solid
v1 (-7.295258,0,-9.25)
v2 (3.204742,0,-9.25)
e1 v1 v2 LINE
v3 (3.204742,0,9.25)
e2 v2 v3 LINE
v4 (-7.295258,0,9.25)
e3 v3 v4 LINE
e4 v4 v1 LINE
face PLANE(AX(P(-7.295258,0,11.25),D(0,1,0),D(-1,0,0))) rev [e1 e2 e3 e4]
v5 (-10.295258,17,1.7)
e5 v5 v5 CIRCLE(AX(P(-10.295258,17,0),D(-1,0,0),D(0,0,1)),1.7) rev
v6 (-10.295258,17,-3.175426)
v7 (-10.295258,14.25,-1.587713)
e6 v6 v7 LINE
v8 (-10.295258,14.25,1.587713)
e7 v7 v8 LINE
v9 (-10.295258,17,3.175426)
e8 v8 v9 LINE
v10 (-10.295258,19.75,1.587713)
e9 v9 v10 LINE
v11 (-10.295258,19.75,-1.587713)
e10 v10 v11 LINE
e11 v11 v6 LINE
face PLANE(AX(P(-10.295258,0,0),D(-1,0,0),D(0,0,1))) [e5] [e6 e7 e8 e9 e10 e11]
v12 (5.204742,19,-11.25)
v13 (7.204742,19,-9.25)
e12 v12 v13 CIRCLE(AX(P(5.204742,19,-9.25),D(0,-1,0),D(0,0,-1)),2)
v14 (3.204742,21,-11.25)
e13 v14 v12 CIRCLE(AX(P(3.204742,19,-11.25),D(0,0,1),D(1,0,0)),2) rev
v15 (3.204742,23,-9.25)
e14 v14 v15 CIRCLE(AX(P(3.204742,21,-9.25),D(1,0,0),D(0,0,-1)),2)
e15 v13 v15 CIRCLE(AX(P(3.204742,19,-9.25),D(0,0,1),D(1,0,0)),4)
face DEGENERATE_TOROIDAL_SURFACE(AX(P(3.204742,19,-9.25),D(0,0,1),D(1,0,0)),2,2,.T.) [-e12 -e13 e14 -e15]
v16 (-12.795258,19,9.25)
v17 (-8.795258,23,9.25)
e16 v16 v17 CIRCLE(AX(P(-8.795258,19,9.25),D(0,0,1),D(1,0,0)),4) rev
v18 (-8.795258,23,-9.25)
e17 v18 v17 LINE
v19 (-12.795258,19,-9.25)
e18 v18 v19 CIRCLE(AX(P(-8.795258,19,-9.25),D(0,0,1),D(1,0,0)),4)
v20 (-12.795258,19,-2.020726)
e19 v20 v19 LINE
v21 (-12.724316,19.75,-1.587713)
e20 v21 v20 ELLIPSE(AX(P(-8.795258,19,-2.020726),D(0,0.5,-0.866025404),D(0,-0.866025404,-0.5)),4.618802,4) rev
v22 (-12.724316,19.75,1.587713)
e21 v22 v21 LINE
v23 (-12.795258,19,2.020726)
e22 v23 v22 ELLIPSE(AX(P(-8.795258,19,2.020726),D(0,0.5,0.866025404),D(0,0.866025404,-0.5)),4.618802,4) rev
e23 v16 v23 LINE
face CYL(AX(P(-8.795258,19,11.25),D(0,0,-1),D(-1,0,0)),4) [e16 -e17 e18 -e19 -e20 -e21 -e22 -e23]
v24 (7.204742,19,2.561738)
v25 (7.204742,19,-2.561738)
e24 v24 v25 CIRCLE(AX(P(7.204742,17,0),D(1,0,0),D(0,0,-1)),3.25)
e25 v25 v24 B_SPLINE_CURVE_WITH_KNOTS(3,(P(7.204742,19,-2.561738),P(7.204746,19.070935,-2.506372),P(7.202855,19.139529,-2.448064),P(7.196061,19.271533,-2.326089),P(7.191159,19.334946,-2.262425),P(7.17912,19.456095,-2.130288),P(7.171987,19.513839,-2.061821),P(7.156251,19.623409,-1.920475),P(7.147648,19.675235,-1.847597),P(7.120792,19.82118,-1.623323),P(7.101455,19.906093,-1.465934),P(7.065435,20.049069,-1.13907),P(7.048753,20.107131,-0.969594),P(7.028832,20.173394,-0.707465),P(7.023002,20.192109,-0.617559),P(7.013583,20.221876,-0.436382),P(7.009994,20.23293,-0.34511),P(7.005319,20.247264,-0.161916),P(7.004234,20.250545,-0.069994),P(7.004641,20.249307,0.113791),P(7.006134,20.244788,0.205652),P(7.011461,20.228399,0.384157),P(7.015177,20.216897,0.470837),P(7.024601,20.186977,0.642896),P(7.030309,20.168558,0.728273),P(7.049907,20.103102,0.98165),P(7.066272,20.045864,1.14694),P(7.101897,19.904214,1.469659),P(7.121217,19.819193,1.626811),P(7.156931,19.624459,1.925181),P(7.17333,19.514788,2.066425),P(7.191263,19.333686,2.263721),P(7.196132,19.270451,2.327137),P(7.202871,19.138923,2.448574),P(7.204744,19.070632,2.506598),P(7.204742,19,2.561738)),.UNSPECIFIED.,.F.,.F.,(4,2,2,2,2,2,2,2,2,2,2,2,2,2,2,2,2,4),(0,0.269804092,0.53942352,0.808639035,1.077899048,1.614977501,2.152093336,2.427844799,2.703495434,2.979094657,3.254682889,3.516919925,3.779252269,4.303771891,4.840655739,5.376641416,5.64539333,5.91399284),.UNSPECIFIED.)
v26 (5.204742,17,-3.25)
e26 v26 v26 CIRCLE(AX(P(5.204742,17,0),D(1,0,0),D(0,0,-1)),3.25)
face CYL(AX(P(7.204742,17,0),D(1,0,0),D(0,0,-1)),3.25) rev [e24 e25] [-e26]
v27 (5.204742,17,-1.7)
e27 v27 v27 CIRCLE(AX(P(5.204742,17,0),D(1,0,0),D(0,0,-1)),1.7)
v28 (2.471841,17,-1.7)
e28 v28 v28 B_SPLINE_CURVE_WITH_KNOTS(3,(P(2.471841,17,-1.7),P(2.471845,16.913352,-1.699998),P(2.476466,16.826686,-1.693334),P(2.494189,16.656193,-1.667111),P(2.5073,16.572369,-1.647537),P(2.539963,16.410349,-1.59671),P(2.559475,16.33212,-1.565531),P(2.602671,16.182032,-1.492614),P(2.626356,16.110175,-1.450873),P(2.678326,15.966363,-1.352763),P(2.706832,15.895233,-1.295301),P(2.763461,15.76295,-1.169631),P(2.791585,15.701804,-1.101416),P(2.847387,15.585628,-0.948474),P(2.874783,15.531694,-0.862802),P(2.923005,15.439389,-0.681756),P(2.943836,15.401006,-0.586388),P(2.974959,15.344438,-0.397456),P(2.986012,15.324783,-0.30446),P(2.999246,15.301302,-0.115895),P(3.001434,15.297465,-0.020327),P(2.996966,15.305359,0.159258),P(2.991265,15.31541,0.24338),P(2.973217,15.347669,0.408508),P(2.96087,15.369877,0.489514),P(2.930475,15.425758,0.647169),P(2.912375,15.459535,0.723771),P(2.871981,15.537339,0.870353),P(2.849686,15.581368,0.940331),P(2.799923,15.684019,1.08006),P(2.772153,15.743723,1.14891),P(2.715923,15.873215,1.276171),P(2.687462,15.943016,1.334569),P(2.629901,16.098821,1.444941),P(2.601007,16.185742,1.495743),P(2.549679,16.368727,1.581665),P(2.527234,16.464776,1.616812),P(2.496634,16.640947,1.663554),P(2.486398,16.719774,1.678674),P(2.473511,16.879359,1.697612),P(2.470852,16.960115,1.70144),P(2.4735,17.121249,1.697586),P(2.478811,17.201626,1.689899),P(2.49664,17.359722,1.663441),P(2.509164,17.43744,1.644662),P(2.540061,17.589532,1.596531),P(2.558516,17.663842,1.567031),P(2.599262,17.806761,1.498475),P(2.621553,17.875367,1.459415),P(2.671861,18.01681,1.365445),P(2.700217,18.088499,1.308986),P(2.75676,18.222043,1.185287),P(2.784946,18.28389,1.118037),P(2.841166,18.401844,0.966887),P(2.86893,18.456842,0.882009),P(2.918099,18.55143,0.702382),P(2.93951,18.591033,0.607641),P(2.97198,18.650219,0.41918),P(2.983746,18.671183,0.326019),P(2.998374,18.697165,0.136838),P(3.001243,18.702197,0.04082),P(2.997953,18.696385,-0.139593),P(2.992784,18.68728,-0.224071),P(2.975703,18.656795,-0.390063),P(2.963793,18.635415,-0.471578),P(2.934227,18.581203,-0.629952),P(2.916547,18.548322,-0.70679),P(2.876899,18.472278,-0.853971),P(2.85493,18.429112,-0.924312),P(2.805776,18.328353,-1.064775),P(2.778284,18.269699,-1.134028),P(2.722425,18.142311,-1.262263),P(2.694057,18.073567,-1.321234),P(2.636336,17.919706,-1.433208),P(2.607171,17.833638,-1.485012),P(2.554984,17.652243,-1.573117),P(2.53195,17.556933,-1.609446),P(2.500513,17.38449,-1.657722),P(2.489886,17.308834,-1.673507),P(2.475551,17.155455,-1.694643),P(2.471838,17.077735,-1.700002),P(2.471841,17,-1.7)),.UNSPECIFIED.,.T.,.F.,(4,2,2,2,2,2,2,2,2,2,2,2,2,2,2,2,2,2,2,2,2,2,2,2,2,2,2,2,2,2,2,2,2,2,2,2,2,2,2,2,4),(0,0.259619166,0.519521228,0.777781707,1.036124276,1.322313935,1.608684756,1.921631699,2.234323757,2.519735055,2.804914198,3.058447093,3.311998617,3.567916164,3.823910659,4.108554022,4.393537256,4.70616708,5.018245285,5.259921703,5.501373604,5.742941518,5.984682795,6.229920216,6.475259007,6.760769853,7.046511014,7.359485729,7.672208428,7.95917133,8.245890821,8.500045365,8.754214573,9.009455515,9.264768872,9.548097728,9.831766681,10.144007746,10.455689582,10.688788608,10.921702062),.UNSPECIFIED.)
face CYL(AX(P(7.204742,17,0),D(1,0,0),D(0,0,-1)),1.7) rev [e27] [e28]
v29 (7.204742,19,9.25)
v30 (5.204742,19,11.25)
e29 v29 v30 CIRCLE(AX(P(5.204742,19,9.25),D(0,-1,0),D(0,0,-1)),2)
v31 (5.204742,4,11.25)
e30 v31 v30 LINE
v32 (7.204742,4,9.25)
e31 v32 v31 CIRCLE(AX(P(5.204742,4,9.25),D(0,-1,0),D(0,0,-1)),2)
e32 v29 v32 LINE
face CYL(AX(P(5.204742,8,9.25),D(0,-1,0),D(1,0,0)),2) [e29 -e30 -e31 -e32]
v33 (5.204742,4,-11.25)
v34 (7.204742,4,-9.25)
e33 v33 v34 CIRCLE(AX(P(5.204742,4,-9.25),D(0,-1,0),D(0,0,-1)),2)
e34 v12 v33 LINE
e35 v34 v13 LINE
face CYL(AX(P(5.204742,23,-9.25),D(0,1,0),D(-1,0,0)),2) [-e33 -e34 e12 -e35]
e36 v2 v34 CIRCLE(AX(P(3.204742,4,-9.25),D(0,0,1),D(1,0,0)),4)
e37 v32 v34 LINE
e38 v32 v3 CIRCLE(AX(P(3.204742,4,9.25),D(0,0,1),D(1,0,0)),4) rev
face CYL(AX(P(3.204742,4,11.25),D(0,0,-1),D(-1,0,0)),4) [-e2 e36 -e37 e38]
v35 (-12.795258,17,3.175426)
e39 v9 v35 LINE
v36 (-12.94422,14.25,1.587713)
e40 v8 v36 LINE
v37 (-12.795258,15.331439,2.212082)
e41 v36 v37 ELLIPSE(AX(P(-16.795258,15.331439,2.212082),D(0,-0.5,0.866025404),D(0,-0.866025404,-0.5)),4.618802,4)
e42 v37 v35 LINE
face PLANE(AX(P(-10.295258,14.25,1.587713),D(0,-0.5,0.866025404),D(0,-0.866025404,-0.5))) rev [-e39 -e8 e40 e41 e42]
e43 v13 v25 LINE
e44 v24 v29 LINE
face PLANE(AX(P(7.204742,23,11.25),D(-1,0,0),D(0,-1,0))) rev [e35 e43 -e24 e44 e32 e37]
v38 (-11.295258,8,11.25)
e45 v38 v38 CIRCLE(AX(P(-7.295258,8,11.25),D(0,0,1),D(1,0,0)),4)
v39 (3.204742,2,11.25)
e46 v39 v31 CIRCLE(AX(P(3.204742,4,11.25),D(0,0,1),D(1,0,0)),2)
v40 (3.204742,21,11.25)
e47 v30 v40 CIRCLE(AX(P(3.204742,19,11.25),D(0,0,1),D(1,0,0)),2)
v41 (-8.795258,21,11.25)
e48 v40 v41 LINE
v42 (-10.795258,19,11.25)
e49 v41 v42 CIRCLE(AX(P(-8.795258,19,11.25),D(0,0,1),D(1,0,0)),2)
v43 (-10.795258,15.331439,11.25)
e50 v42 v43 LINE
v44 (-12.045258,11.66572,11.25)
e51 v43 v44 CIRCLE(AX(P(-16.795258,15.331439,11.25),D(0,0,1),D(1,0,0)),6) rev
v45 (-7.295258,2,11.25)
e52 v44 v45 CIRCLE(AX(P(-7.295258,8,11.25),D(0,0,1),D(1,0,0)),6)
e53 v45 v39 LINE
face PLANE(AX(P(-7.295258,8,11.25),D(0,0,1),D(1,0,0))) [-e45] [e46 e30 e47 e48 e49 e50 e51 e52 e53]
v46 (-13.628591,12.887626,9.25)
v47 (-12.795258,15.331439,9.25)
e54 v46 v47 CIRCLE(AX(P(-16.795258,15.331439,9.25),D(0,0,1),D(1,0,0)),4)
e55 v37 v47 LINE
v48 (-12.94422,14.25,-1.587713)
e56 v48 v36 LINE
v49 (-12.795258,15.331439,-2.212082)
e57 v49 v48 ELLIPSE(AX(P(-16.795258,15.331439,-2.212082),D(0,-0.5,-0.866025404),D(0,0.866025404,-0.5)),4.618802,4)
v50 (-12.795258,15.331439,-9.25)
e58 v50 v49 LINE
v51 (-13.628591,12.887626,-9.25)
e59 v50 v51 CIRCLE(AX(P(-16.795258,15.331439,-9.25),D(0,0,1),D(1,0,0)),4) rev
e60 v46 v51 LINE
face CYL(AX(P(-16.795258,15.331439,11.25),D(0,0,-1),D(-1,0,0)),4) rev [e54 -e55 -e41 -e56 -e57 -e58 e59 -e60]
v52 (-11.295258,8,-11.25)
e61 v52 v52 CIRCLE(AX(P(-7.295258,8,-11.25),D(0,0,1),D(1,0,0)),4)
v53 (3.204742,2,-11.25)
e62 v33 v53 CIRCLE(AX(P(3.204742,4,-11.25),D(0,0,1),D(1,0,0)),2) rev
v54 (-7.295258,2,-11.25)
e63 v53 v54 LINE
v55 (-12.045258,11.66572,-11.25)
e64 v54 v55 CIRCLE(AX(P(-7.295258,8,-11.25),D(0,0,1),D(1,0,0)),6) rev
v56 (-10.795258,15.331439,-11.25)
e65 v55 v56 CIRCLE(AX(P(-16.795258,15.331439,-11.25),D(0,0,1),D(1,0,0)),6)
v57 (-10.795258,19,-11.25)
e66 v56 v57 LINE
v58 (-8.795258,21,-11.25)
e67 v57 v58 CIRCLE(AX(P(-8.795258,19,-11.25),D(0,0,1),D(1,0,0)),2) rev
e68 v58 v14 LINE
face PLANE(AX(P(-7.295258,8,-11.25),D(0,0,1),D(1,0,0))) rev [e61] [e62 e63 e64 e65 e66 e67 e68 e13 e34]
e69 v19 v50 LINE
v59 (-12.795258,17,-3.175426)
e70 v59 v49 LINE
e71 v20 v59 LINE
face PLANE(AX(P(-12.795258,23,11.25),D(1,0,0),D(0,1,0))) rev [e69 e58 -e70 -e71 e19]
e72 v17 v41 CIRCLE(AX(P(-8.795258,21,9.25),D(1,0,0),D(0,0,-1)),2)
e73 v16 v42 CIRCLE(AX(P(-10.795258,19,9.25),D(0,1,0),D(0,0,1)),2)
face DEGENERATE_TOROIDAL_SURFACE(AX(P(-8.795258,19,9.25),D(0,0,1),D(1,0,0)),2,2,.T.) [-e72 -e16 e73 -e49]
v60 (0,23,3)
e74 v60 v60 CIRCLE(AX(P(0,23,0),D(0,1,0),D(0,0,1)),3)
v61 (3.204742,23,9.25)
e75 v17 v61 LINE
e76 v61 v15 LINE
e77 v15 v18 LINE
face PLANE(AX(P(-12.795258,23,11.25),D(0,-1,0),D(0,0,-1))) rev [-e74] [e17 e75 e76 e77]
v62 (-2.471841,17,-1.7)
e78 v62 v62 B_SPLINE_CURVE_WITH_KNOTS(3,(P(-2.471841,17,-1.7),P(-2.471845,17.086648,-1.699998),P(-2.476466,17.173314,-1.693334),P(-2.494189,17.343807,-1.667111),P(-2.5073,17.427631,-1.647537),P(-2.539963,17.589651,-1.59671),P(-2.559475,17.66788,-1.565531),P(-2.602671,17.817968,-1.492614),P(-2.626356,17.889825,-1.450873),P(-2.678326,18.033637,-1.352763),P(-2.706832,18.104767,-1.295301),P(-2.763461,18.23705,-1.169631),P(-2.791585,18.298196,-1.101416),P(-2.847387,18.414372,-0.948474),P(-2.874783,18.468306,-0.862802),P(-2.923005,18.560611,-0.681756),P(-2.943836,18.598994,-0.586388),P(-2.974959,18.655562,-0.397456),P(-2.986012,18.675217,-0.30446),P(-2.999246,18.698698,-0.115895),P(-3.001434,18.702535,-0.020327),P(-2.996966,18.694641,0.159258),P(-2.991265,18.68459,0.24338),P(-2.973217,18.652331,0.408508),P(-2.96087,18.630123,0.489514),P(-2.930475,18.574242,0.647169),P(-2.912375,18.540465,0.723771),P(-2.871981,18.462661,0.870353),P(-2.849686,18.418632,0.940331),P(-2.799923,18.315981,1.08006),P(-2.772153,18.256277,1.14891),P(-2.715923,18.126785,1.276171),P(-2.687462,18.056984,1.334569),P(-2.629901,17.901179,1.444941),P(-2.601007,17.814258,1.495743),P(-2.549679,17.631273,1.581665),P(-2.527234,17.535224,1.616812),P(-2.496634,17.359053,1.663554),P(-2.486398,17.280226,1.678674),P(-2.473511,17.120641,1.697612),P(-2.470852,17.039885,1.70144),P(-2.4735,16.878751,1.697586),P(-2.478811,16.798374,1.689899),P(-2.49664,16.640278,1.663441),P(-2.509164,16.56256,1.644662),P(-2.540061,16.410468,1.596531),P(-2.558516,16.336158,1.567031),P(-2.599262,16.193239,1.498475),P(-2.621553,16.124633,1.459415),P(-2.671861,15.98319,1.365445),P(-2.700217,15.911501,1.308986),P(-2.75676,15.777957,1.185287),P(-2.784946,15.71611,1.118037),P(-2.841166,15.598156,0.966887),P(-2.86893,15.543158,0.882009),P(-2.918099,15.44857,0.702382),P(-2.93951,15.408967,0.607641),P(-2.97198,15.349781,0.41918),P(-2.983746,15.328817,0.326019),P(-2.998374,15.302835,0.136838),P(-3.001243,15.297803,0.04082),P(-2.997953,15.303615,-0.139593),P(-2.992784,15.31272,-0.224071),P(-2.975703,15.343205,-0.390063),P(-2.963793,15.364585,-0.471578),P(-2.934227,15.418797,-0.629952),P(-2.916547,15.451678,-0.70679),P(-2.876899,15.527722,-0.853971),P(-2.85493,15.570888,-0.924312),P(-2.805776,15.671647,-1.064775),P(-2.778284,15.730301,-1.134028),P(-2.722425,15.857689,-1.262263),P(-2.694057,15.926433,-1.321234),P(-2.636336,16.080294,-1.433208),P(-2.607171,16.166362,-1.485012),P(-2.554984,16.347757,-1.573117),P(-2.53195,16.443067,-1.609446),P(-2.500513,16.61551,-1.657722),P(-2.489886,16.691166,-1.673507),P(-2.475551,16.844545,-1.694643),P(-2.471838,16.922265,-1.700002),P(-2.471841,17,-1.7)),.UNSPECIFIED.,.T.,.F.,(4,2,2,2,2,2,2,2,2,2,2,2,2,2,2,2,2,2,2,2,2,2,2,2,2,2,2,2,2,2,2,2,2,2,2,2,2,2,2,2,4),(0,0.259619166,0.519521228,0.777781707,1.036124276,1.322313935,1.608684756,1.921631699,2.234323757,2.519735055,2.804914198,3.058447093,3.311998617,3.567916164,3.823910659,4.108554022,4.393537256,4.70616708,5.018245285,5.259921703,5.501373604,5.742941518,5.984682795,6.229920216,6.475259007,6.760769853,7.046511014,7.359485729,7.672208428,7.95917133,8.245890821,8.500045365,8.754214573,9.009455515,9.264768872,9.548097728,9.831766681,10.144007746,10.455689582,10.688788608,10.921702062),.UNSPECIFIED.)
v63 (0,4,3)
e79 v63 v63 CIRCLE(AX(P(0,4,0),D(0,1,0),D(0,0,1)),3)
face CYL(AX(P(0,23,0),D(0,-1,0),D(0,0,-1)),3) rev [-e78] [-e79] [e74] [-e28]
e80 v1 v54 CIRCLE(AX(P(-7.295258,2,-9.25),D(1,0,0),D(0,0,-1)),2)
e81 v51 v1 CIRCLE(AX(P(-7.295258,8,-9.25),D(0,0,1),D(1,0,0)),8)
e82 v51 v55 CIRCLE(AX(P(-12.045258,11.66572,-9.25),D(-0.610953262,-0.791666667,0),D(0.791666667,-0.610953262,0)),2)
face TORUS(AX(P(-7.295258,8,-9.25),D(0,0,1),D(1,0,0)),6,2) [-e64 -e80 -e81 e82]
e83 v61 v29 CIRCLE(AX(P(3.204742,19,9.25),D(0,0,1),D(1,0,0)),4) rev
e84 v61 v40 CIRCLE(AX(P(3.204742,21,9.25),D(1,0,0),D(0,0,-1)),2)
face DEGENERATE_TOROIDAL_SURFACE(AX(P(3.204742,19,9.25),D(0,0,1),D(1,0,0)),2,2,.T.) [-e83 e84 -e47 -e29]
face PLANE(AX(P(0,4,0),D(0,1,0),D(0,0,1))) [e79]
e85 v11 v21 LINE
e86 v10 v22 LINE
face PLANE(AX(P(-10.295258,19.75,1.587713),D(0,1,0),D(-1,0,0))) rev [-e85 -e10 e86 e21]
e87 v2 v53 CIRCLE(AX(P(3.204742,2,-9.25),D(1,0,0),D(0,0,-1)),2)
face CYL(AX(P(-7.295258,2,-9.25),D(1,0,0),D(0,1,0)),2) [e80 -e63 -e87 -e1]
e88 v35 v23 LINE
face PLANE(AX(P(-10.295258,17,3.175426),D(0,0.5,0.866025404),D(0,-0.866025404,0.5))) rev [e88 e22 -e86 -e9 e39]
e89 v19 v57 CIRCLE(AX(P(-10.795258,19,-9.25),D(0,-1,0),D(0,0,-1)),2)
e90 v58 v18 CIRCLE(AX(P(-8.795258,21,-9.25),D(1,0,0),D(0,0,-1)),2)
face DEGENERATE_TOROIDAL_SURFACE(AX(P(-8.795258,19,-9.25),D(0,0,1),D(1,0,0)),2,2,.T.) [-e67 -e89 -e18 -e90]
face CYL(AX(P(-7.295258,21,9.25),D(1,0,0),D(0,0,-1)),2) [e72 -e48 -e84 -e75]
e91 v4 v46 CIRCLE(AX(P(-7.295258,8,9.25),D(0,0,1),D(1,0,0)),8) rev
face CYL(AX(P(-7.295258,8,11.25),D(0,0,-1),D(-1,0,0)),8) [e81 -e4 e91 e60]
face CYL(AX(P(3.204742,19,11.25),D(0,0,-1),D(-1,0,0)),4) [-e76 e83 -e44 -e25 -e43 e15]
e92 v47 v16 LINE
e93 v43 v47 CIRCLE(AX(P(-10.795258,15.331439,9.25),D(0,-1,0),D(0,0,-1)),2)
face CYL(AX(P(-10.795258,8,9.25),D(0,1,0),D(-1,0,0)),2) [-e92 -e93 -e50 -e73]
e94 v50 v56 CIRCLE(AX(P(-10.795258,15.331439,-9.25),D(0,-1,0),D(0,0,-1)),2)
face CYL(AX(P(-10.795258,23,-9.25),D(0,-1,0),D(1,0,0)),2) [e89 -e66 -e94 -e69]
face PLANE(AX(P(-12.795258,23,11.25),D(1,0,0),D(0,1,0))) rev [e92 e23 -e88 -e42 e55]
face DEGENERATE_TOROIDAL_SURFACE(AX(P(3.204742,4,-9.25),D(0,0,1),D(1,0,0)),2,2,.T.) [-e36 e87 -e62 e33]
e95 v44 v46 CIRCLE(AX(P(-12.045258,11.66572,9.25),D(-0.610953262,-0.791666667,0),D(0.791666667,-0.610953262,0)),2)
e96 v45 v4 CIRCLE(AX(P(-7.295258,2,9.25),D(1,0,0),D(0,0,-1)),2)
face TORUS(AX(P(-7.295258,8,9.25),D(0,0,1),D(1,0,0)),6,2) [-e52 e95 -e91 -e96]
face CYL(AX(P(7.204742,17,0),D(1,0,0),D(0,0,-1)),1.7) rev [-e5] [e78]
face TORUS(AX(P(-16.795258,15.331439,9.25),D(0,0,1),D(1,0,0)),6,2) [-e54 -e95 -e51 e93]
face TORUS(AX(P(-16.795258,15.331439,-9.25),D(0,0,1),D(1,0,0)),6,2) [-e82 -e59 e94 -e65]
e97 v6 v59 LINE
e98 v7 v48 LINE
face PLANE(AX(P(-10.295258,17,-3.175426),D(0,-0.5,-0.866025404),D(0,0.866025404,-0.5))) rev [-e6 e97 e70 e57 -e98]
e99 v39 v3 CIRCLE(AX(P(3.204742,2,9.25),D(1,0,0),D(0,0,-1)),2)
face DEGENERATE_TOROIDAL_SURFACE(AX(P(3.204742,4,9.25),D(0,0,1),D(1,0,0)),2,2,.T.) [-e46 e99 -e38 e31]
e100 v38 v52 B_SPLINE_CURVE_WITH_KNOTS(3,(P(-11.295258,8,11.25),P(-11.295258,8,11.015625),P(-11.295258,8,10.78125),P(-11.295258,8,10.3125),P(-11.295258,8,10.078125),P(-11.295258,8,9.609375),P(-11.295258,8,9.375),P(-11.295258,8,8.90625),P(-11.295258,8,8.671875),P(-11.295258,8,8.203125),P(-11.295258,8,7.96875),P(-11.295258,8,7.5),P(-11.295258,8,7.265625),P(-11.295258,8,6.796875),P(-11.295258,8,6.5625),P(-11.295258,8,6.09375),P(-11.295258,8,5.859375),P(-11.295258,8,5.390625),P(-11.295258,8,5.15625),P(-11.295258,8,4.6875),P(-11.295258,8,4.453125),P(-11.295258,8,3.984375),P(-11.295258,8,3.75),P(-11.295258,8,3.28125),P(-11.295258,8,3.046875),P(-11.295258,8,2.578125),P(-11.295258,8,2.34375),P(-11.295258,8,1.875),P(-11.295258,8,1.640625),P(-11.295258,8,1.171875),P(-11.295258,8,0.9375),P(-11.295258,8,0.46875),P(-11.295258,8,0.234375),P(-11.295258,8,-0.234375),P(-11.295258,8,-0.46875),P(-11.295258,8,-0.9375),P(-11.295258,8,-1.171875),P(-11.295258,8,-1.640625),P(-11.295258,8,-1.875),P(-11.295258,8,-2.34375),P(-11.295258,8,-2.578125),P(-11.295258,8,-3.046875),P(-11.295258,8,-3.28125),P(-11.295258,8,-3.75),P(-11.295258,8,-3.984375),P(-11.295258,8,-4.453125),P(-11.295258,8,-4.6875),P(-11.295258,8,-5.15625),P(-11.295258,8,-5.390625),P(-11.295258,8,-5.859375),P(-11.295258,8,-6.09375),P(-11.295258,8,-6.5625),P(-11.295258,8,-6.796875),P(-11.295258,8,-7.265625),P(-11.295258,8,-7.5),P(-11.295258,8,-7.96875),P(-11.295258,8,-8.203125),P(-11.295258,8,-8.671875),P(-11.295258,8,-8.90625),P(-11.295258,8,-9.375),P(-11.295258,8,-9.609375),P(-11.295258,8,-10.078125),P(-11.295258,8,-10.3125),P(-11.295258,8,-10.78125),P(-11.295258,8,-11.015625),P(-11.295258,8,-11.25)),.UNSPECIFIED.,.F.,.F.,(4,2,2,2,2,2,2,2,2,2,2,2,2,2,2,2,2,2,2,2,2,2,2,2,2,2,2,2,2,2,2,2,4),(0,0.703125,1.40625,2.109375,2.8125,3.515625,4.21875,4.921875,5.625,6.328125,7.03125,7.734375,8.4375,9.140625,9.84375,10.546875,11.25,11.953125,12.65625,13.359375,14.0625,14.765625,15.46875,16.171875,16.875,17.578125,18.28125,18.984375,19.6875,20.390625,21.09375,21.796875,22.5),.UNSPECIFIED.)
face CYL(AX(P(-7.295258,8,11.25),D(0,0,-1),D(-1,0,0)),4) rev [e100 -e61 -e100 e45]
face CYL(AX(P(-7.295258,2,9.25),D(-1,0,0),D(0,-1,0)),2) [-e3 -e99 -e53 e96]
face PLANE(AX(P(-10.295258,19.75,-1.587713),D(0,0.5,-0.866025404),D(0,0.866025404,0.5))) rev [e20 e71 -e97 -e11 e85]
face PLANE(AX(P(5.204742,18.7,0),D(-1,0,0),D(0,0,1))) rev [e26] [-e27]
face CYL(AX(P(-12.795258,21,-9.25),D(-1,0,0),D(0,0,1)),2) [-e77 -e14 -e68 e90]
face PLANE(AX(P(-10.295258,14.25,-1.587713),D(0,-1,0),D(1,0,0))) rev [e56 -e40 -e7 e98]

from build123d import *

# Parameters (mm, degrees)
ESQUISSE1_R                                     = 4
BOSS_EXTRU_1_DEPTH                              = 11.25
ENL_V_START                                     = 4
ESQUISSE2_R                                     = 3
ENL_V_MAT_EXTRU_1_DEPTH                         = 26.824610856
CHAMBRAGE_POUR_VIS_T_TE_CYLINDRIQUE_D           = 3.4
CHAMBRAGE_POUR_VIS_T_TE_CYLINDRIQUE_CBORE_D     = 6.5
CHAMBRAGE_POUR_VIS_T_TE_CYLINDRIQUE_CBORE_DEPTH = 2
ENL_V_MAT_EXTRU_6_DEPTH                         = 2.5
CONG_3_R                                        = 4
CONG_4_R                                        = 2


with BuildPart() as part:
    # Esquisse1 → Boss.-Extru.1 (new, symmetric)
    with BuildSketch(Plane.XY):
        with BuildLine():
            Line((-12.79525785, 23), (7.20474215, 23))
            Line((7.20474215, 23), (7.20474215, 0))
            Line((7.20474215, 0), (-7.29525785, 0))
            ThreePointArc((-7.29525785, 0), (-14.72747825, 5.039915555), (-12.79525785, 13.809475019))
            Line((-12.79525785, 13.809475019), (-12.79525785, 23))
        make_face()
        with Locations(Location((-7.29525785, 8, 0), (0, 0, 180))):
            Circle(ESQUISSE1_R, mode=Mode.SUBTRACT)
    extrude(amount=BOSS_EXTRU_1_DEPTH, both=True)

    # Esquisse2 → Enlèv. mat.-Extru.1 (cut, through all)
    with BuildSketch(Plane(origin=(0, 0, 0), x_dir=(1, 0, 0), z_dir=(0, 1, 0)).offset(ENL_V_START)):
        with Locations(Location((0, 0, 0), (0, 0, 270))):
            Circle(ESQUISSE2_R)
    extrude(amount=ENL_V_MAT_EXTRU_1_DEPTH, mode=Mode.SUBTRACT)

    # Chambrage pour vis à tête cylindrique à 6 pans creux (ou vis CHC) M31 (through all)
    with Locations(Plane(origin=(7.20474215, 0, 0), x_dir=(0, 0, -1), z_dir=(1, 0, 0))):
        with Locations((0, 17)):
            CounterBoreHole(CHAMBRAGE_POUR_VIS_T_TE_CYLINDRIQUE_D / 2, CHAMBRAGE_POUR_VIS_T_TE_CYLINDRIQUE_CBORE_D / 2, CHAMBRAGE_POUR_VIS_T_TE_CYLINDRIQUE_CBORE_DEPTH)

    # Esquisse10 → Enlèv. mat.-Extru.6 (cut)
    with BuildSketch(Plane.ZY.offset(12.79525785)):
        Polygon((1.58771324, 14.25), (3.175426481, 17), (1.58771324, 19.75), (-1.58771324, 19.75), (-3.175426481, 17), (-1.58771324, 14.25), align=None)
    extrude(amount=-ENL_V_MAT_EXTRU_6_DEPTH, mode=Mode.SUBTRACT)

    # Congé3
    # the kernel refuses this fillet: 4 mm, written as the material it adds along each edge
    with BuildSketch(Plane(origin=(-12.79525785, 13.809475019, -11.25), x_dir=(0, 1, 0), z_dir=(0, 0, 1))) as cong_3_piece_1_section:
        with BuildLine():
            CenterArc((1.52196413, 4), CONG_3_R, 232.341537994, 37.658462006)
            ThreePointArc((-0.92184892, 0.833333333), (-0.444719275, 0.434593145), (0, 0))
            Line((0, 0), (1.52196413, 0))
        make_face()
    cong_3_piece_1 = extrude(amount=22.5, mode=Mode.PRIVATE)
    cong_3_piece_1 = split(cong_3_piece_1, bisect_by=Plane(origin=(-12.787909879, 14.25, -6.543416313), z_dir=(0, 1, 0)), keep=Keep.TOP, mode=Mode.PRIVATE)
    cong_3_piece_1 = split(cong_3_piece_1, bisect_by=Plane(origin=(-12.787909879, 16.719497951, -3.013478547), z_dir=(0, -0.5000000000000004, -0.8660254037844384)), keep=Keep.TOP, mode=Mode.PRIVATE)
    add(cong_3_piece_1)
    with BuildSketch(Plane(origin=(-12.79525785, 13.809475019, -11.25), x_dir=(0, 1, 0), z_dir=(0, 0, 1))) as cong_3_piece_2_section:
        with BuildLine():
            CenterArc((1.52196413, 4), CONG_3_R, 232.341537994, 37.658462006)
            ThreePointArc((-0.92184892, 0.833333333), (-0.444719275, 0.434593145), (0, 0))
            Line((0, 0), (1.52196413, 0))
        make_face()
    cong_3_piece_2 = extrude(amount=22.5, mode=Mode.PRIVATE)
    cong_3_piece_2 = split(cong_3_piece_2, bisect_by=Plane(origin=(-13.040905226, 14.25, -6.25233642), z_dir=(0, -1, 0)), keep=Keep.TOP, mode=Mode.PRIVATE)
    cong_3_piece_2 = split(cong_3_piece_2, bisect_by=Plane(origin=(-13.040905226, 15.837208914, -2.504088734), z_dir=(0, -0.5000000000000004, -0.8660254037844384)), keep=Keep.TOP, mode=Mode.PRIVATE)
    add(cong_3_piece_2)
    with BuildSketch(Plane(origin=(-12.79525785, 13.809475019, -11.25), x_dir=(0, 1, 0), z_dir=(0, 0, 1))) as cong_3_piece_3_section:
        with BuildLine():
            CenterArc((1.52196413, 4), CONG_3_R, 232.341537994, 37.658462006)
            ThreePointArc((-0.92184892, 0.833333333), (-0.444719275, 0.434593145), (0, 0))
            Line((0, 0), (1.52196413, 0))
        make_face()
    cong_3_piece_3 = extrude(amount=22.5, mode=Mode.PRIVATE)
    cong_3_piece_3 = split(cong_3_piece_3, bisect_by=Plane(origin=(-13.005461126, 14.25, 0), z_dir=(0, -1, 0)), keep=Keep.TOP, mode=Mode.PRIVATE)
    cong_3_piece_3 = split(cong_3_piece_3, bisect_by=Plane(origin=(-13.005461126, 13.176729328, -0.968060129), z_dir=(0, 0.5000000000000004, 0.8660254037844384)), keep=Keep.TOP, mode=Mode.PRIVATE)
    cong_3_piece_3 = split(cong_3_piece_3, bisect_by=Plane(origin=(-13.005461126, 13.176729328, 0.968060129), z_dir=(0, 0.49999999999999994, -0.8660254037844387)), keep=Keep.TOP, mode=Mode.PRIVATE)
    add(cong_3_piece_3)
    with BuildSketch(Plane(origin=(-12.79525785, 13.809475019, -11.25), x_dir=(0, 1, 0), z_dir=(0, 0, 1))) as cong_3_piece_4_section:
        with BuildLine():
            CenterArc((1.52196413, 4), CONG_3_R, 232.341537994, 37.658462006)
            ThreePointArc((-0.92184892, 0.833333333), (-0.444719275, 0.434593145), (0, 0))
            Line((0, 0), (1.52196413, 0))
        make_face()
    cong_3_piece_4 = extrude(amount=22.5, mode=Mode.PRIVATE)
    cong_3_piece_4 = split(cong_3_piece_4, bisect_by=Plane(origin=(-12.787909879, 14.25, 6.543416313), z_dir=(0, 1, 0)), keep=Keep.TOP, mode=Mode.PRIVATE)
    cong_3_piece_4 = split(cong_3_piece_4, bisect_by=Plane(origin=(-12.787909879, 16.719497951, 3.013478547), z_dir=(0, -0.49999999999999994, 0.8660254037844387)), keep=Keep.TOP, mode=Mode.PRIVATE)
    add(cong_3_piece_4)
    with BuildSketch(Plane(origin=(-12.79525785, 13.809475019, -11.25), x_dir=(0, 1, 0), z_dir=(0, 0, 1))) as cong_3_piece_5_section:
        with BuildLine():
            CenterArc((1.52196413, 4), CONG_3_R, 232.341537994, 37.658462006)
            ThreePointArc((-0.92184892, 0.833333333), (-0.444719275, 0.434593145), (0, 0))
            Line((0, 0), (1.52196413, 0))
        make_face()
    cong_3_piece_5 = extrude(amount=22.5, mode=Mode.PRIVATE)
    cong_3_piece_5 = split(cong_3_piece_5, bisect_by=Plane(origin=(-13.040905226, 14.25, 6.25233642), z_dir=(0, -1, 0)), keep=Keep.TOP, mode=Mode.PRIVATE)
    cong_3_piece_5 = split(cong_3_piece_5, bisect_by=Plane(origin=(-13.040905226, 15.837208914, 2.504088734), z_dir=(0, -0.49999999999999994, 0.8660254037844387)), keep=Keep.TOP, mode=Mode.PRIVATE)
    add(cong_3_piece_5)
    # the kernel refuses this fillet: 4 mm, written as the material it takes off along each edge
    with BuildSketch(Plane(origin=(7.20474215, 0, -21.25), x_dir=(-1, 0, 0), z_dir=(0, 0, 1)), Plane(origin=(-12.79525785, 23, 21.25), x_dir=(0, -1, 0), z_dir=(0, 0, -1))) as cong_3_2_piece_1:
        with BuildLine():
            CenterArc((CONG_3_R, -CONG_3_R), CONG_3_R, 90, 90)
            Line((0, -CONG_3_R), (0, 0))
            Line((0, 0), (CONG_3_R, 0))
        make_face()
    extrude(amount=42.5, mode=Mode.SUBTRACT)
    with BuildSketch(Plane(origin=(7.20474215, 23, 21.25), x_dir=(0, -1, 0), z_dir=(0, 0, -1))) as cong_3_2_piece_2:
        with BuildLine():
            CenterArc((CONG_3_R, CONG_3_R), CONG_3_R, 180, 90)
            Line((0, CONG_3_R), (0, 0))
            Line((0, 0), (CONG_3_R, 0))
        make_face()
    extrude(amount=42.5, mode=Mode.SUBTRACT)

    # Congé4
    cong_4_edges = [part.edges().sort_by_distance(p)[0] for p in [
        (-2.04525785, 0, 11.25),
        (-2.79525785, 23, -11.25),
        (-2.79525785, 23, 11.25),
        (-2.04525785, 0, -11.25),
        (-12.79525785, 17.165719575, -11.25),
        (7.20474215, 11.5, -11.25),
        (-14.475125843, 4.471615724, -11.25),
        (-11.623684975, 21.828427125, -11.25),
        (6.033169275, 1.171572875, -11.25),
        (6.033169275, 21.828427125, -11.25),
        (7.20474215, 11.5, 11.25),
        (-12.79525785, 17.165719575, 11.25),
        (-14.475125843, 4.471615724, 11.25),
        (-11.623684975, 21.828427125, 11.25),
        (6.033169275, 1.171572875, 11.25),
        (6.033169275, 21.828427125, 11.25),
        (-13.009318953, 14.040444701, -11.25),
        (-13.009318953, 14.040444701, 11.25),
    ]]
    fillet(cong_4_edges, radius=CONG_4_R)


solid = part.part
